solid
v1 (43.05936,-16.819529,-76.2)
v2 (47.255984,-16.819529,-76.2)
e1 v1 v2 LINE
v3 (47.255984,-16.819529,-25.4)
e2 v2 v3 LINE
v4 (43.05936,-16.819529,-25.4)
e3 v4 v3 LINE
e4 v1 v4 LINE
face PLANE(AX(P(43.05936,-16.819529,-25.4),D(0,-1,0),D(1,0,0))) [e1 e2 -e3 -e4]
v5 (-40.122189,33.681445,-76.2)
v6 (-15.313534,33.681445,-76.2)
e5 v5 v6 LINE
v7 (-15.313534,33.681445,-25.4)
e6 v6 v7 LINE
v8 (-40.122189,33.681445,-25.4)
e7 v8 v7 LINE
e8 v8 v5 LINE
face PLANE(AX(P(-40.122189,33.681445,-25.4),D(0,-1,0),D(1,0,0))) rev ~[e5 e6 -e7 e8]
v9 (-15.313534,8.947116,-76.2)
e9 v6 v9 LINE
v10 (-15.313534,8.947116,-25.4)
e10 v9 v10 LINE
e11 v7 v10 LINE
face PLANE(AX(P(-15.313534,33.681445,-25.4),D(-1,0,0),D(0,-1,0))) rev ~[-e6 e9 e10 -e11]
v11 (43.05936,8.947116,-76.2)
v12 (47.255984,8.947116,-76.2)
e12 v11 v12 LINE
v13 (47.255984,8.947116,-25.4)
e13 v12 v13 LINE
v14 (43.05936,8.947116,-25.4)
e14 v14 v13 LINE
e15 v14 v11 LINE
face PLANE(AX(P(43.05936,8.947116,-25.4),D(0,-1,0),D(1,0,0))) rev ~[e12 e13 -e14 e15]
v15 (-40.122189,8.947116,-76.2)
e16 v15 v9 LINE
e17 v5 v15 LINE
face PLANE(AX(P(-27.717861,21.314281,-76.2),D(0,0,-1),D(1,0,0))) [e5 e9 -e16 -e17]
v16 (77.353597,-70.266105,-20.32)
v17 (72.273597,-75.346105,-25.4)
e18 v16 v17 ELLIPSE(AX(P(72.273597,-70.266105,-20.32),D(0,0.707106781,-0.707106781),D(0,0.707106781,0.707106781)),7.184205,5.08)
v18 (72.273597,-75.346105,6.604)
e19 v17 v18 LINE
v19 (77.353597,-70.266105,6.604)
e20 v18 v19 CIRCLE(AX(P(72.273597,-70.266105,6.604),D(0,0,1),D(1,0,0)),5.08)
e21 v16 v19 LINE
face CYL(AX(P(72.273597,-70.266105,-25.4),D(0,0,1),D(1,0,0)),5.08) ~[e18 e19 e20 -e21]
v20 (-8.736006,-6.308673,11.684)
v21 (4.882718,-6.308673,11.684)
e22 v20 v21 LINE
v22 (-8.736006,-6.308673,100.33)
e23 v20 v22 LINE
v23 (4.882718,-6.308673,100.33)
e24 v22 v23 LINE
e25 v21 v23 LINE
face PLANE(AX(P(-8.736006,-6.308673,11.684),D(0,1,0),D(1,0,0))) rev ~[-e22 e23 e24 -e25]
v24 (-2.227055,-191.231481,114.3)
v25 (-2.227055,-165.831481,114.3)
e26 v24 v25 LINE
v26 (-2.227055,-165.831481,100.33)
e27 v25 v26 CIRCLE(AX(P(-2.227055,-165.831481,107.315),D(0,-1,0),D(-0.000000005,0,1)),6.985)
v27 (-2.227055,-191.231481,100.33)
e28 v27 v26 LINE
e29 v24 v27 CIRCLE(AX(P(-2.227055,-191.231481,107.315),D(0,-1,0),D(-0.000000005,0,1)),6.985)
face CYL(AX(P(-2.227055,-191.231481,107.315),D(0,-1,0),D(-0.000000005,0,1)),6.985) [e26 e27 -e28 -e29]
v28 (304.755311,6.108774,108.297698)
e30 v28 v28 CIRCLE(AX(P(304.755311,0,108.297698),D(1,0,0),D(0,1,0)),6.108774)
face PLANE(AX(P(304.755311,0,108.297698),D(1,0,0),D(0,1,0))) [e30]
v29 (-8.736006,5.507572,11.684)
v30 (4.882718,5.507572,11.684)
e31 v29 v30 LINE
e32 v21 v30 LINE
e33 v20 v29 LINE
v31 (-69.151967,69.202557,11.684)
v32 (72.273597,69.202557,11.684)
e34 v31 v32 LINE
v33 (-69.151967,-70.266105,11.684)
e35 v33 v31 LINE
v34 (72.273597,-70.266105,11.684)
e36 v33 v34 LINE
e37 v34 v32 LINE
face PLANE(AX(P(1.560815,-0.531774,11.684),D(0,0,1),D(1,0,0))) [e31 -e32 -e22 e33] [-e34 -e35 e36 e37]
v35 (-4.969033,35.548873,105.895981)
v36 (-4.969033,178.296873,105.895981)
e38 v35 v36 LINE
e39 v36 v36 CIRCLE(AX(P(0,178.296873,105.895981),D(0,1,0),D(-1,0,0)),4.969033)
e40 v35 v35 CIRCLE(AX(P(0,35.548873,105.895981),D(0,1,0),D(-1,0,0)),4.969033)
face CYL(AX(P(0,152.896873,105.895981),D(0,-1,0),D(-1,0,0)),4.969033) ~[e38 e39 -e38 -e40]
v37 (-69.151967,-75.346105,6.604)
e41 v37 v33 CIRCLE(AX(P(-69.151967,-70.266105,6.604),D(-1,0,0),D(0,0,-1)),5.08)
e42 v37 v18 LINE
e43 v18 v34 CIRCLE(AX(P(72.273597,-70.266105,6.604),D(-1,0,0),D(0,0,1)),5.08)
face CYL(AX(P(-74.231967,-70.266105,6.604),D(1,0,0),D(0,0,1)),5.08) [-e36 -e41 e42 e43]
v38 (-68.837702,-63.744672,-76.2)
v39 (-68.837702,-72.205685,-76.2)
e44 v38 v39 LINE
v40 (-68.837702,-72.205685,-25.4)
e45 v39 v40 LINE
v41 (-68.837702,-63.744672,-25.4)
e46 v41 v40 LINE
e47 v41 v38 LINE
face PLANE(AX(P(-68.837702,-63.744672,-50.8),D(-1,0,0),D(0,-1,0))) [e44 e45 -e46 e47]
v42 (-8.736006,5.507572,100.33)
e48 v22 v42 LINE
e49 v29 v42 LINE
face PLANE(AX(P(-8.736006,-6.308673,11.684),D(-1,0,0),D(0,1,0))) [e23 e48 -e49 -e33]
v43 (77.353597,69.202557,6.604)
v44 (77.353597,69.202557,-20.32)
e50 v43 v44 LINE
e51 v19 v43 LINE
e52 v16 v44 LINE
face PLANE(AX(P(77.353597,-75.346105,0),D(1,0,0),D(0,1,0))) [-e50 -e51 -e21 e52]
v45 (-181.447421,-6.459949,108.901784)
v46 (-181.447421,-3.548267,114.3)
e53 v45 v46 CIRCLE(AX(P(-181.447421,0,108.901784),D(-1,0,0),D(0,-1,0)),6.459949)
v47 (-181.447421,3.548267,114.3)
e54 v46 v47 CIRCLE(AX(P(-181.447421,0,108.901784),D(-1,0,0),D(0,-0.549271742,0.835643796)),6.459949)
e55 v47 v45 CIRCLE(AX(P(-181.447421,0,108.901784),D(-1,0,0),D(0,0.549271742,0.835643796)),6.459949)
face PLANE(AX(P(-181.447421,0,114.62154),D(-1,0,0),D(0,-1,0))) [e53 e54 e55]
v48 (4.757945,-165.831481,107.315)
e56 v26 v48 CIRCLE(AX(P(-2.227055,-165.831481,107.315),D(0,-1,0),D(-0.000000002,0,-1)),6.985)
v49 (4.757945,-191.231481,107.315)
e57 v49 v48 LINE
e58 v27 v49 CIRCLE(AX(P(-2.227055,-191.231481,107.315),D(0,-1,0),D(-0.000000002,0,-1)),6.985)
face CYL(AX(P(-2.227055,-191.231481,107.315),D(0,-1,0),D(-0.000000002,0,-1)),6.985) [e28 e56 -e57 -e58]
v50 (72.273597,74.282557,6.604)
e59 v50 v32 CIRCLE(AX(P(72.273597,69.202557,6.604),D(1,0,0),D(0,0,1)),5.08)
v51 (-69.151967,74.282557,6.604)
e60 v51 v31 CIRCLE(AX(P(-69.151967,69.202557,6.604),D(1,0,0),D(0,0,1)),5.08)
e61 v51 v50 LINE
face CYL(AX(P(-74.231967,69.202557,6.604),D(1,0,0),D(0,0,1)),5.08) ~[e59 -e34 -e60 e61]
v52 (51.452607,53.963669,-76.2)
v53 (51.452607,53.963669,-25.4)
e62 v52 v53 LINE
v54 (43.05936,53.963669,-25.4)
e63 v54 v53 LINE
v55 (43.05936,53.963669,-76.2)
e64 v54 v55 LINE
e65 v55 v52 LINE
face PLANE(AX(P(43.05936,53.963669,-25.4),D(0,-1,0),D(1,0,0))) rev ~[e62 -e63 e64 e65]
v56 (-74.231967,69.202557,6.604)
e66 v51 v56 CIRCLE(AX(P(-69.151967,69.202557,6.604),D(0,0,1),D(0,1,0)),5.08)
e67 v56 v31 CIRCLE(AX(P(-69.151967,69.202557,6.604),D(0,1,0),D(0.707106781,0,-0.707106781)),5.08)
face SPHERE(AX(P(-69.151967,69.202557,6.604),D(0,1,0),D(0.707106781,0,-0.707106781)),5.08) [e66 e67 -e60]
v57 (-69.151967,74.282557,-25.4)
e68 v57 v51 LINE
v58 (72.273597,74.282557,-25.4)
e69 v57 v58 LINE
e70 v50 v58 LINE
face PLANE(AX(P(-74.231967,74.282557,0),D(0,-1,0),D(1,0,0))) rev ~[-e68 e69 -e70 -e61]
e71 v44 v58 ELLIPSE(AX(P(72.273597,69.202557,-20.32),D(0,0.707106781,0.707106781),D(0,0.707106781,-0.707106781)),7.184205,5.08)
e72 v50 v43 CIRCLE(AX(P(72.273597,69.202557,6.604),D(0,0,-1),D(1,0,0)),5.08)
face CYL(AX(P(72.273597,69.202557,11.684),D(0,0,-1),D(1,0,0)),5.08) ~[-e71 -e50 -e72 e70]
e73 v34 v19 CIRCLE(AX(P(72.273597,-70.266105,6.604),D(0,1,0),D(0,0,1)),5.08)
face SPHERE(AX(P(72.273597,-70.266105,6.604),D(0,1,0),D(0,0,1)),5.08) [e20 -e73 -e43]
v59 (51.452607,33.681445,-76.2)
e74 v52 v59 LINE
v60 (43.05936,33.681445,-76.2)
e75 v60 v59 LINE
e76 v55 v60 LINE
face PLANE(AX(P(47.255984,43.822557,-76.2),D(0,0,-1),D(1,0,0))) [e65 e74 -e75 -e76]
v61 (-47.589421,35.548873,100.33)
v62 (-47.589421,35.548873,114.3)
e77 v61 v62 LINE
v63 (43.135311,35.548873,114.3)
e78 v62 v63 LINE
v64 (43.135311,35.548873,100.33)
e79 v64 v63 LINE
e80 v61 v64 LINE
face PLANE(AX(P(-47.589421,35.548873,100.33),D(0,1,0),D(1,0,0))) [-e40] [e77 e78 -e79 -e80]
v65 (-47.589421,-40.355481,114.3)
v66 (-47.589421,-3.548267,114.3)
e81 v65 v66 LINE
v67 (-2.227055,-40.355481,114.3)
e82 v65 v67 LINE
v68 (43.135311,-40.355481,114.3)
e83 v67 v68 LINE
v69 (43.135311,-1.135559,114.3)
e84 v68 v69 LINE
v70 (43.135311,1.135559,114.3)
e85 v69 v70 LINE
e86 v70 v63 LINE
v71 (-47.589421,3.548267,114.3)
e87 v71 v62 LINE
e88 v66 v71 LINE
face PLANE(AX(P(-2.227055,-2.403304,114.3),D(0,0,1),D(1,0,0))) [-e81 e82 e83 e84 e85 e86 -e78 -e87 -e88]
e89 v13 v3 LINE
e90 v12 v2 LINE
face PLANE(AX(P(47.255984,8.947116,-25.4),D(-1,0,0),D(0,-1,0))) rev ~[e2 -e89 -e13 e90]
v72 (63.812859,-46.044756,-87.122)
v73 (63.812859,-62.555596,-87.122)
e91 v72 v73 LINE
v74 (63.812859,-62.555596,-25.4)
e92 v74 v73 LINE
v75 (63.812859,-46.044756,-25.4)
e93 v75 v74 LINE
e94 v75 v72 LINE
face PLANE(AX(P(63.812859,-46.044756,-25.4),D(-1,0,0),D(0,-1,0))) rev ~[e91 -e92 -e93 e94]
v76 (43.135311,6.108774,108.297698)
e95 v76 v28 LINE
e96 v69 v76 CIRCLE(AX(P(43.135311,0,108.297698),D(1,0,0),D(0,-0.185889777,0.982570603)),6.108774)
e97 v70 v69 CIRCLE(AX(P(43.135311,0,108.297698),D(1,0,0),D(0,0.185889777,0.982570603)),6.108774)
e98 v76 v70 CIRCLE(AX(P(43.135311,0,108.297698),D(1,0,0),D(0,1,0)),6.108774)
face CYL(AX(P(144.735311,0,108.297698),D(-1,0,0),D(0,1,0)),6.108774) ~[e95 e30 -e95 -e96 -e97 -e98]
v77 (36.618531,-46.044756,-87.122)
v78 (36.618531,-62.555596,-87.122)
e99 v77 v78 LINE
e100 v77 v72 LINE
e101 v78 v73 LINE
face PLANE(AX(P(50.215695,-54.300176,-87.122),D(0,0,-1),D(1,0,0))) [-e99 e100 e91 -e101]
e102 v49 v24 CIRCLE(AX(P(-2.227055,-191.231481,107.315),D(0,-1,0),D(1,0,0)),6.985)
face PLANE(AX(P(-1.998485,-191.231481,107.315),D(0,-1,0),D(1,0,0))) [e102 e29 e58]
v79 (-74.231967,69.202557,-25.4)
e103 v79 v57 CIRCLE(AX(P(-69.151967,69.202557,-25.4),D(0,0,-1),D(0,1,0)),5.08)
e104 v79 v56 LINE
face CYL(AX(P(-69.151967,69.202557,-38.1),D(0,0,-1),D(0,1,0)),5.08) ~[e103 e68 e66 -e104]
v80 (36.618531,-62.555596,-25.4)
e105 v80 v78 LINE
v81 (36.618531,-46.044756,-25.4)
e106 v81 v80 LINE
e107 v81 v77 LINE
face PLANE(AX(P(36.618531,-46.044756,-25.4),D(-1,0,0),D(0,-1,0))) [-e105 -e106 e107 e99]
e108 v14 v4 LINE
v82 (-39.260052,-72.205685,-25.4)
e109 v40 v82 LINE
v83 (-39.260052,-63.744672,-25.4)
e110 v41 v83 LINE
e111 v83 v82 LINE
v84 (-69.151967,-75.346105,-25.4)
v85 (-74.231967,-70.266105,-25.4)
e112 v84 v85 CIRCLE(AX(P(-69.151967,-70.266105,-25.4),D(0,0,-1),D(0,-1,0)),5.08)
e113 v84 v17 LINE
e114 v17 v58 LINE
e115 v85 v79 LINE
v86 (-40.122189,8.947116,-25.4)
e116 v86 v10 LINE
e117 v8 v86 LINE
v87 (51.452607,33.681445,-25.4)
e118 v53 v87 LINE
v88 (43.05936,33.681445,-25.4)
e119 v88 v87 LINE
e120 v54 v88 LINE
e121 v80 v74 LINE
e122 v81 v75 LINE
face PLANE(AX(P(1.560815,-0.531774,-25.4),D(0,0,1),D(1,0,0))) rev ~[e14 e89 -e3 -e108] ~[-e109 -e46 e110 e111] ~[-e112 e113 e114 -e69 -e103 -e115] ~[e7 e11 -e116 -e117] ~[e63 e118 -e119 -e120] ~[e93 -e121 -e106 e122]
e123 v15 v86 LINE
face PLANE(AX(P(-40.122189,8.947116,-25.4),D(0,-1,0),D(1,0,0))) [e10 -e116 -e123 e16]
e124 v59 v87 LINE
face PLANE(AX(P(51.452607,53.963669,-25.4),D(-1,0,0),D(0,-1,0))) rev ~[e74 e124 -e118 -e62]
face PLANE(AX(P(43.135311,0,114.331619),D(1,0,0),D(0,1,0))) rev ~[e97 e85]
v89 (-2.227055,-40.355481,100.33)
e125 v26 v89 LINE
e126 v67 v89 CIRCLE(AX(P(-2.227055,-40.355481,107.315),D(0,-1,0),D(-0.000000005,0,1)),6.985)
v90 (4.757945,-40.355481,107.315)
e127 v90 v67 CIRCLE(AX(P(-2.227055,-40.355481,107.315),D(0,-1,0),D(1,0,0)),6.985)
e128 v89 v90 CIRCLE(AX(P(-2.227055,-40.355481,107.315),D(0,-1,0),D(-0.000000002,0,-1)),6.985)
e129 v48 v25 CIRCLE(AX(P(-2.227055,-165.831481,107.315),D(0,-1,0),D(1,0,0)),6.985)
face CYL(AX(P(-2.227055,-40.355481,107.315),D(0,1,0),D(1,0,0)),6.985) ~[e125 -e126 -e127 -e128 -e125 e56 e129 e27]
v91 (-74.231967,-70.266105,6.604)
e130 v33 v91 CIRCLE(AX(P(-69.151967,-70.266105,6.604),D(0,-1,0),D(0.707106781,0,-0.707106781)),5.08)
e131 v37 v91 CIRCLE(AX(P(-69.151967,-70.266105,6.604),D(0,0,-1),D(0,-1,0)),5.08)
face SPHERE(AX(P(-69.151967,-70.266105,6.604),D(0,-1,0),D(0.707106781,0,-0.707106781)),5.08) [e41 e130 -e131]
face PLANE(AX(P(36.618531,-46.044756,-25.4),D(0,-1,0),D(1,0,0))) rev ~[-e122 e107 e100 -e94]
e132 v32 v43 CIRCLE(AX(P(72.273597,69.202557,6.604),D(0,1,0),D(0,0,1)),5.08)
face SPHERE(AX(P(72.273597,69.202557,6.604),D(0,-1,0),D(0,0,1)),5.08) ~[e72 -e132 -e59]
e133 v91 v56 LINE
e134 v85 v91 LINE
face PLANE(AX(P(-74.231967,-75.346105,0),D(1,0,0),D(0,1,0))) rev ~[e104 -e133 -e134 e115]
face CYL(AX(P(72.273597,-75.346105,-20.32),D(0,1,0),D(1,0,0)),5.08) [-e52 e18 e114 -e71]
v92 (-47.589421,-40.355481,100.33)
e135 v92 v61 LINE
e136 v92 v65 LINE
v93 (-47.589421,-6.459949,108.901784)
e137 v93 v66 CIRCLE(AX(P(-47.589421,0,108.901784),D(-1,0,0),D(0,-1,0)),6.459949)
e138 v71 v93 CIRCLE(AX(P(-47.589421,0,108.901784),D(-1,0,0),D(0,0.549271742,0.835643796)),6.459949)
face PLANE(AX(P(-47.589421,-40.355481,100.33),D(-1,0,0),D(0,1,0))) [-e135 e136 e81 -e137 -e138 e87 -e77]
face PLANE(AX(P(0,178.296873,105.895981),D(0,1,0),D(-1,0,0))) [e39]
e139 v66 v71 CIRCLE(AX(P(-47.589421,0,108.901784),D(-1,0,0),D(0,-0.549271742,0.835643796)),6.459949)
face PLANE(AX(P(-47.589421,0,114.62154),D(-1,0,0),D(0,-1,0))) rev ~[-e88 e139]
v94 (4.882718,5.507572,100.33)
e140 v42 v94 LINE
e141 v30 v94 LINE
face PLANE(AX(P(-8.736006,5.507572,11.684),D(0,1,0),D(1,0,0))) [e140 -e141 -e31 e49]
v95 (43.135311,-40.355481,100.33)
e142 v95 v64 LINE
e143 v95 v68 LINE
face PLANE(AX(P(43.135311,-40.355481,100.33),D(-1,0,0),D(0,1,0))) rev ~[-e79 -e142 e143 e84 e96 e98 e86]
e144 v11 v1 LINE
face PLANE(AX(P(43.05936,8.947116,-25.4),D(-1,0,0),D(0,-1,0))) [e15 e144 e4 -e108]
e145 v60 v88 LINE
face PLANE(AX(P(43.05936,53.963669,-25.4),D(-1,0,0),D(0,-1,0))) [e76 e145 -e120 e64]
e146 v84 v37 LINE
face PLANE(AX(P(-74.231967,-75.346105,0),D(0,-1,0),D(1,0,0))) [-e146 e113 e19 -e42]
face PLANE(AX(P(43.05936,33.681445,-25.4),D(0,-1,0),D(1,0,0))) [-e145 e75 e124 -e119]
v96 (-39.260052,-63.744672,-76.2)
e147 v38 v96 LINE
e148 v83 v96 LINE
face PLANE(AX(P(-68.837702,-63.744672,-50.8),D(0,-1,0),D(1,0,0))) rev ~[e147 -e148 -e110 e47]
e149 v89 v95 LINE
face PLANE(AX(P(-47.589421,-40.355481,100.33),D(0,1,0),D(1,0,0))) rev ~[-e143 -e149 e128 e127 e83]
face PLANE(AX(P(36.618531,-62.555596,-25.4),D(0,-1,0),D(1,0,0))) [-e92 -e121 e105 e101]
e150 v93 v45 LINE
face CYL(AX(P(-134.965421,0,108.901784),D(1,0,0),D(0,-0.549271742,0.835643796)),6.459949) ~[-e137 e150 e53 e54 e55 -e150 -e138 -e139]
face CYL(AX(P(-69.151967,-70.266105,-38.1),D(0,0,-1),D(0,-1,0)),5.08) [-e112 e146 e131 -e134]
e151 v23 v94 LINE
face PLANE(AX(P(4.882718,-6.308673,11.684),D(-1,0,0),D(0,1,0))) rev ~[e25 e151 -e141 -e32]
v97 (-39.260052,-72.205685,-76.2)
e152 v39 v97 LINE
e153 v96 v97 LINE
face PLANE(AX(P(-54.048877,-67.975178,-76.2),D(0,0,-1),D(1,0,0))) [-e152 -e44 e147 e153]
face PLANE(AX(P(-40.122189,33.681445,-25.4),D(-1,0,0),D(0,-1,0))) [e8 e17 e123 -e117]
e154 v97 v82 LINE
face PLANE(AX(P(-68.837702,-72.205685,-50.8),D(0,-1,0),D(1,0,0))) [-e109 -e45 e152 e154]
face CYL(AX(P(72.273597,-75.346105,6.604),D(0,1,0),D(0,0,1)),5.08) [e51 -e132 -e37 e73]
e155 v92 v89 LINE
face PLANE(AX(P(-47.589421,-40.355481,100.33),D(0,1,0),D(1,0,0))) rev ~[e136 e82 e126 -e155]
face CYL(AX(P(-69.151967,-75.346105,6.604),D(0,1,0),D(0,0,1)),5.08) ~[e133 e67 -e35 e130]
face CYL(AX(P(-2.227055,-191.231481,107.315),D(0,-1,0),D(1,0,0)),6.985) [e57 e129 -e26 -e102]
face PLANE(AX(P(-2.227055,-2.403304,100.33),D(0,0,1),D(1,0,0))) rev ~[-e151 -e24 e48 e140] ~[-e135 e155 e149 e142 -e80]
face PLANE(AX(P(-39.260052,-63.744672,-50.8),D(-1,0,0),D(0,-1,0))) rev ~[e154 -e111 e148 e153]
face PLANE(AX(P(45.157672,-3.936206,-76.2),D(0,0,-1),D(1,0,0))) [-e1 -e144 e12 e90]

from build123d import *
from build123d import SkipClean  # not in build123d's __all__

# Parameters (mm, degrees)
F0_W          = 151.5855640173
F0_H          = 149.6286615729
F1_DEPTH      = 11.684
F2_DEPTH      = 25.4
F3_W          = 4.1966233402
F3_H          = 25.7666455582
F3_W_2        = 24.8086545616
F3_H_2        = 24.7343285009
F3_W_3        = 8.3932466805
F3_H_3        = 20.2822238207
F3_W_4        = 29.5776501298
F3_H_4        = 8.4610134363
F5_DEPTH      = 25.4
F6_DEPTH      = 25.4
F8_W          = 13.618723955
F8_H          = 11.8162455037
F9_DEPTH      = 88.646
F10_W         = 90.7247327268
F10_H         = 75.9043544531
F11_DEPTH     = 13.97
F13_DEPTH     = 25.4
F14_DEPTH     = 125.476
F16_DEPTH     = 25.4
F17_R         = 4.969033059
F18_DEPTH     = 117.348
F20_DEPTH     = 87.376
F21_R         = 6.1087740457
F22_DEPTH     = 25.4
F23_DEPTH     = 25.4
F24_DEPTH     = 25.4
F25_R         = 5.08
F26_T1_DEPTH  = 44.704
F26_S5_W      = 5.08
F26_S5_H      = 5.08
F26_T6_DEPTH  = 5.08
F26_S11_W     = 5.08
F26_S11_H     = 5.08
F26_T12_DEPTH = 5.08
F27_W         = 27.1943286061
F27_H         = 16.5108405054
F28_DEPTH     = 61.722
F29_DEPTH     = 25.4
F30_DEPTH     = 160.02
F31_DEPTH     = 46.482


# Not quite as in the source:
# - a fillet or chamfer that OpenCascade refuses, or shapes differently, is made with other operations: its cross-section is extruded or revolved along the edge and cut away or added
# - after a boolean that leaves OpenCascade's solid faulty, fix() repairs it
# - a feature names something its author has since deleted; it is built from what else it names


with BuildPart() as f1:
    # F0 (on Top) → F1 (new body)
    with BuildSketch(Plane.XY):
        with Locations((1.5608146787, -0.5317740142)):
            Rectangle(F0_W, F0_H)
    extrude(amount=F1_DEPTH)

    # F2 (add): a face of the model
    f2_faces = [f1.faces().sort_by_distance(p)[0] for p in [
        (1.5608146787, -0.5317740142, 0),
    ]]
    extrude(f2_faces, amount=F2_DEPTH)

    # F3 (on face) → F5 (join)
    with BuildSketch(Plane(origin=(0, 0, -25.4), x_dir=(1, 0, 0), z_dir=(0, 0, -1))):
        with Locations((45.1576719061, 3.9362064563)):
            Rectangle(F3_W, F3_H)
        with Locations((-27.7178613469, -21.3142805733)):
            Rectangle(F3_W_2, F3_H_2)
        with Locations((47.2559835762, -43.8225567341)):
            Rectangle(F3_W_3, F3_H_3)
        with Locations((-54.0488772094, 67.9751783609)):
            Rectangle(F3_W_4, F3_H_4)
    extrude(amount=F5_DEPTH)

    # F6 (add): faces of the model
    f6_faces = [f1.faces().sort_by_distance(p)[0] for p in [
        (-54.0488772094, -67.9751783609, -50.8),
        (-27.7178613469, 21.3142805733, -50.8),
        (45.1576719061, -3.9362064563, -50.8),
        (47.2559835762, 43.8225567341, -50.8),
    ]]
    extrude(f6_faces, amount=F6_DEPTH)

    # F8 (on face) → F9 (join)
    with BuildSketch(Plane.XY.offset(11.684)):
        with Locations((-1.9266440067, -0.4005506635)):
            Rectangle(F8_W, F8_H)
    extrude(amount=F9_DEPTH)

    # F10 (on face) → F11 (join)
    with BuildSketch(Plane.XY.offset(100.33)):
        with Locations((-2.2270549089, -2.4033039808)):
            Rectangle(F10_W, F10_H)
    extrude(amount=F11_DEPTH)

    # F12 (on face) → F13 (join)
    with BuildSketch(Plane.XZ.offset(40.3554812074)):
        with BuildLine():
            ThreePointArc((-2.2270549227, 100.33), (2.7120859528, 102.3758591285), (4.7579450911, 107.315))
            ThreePointArc((4.7579450911, 107.315), (2.712085945, 112.2541408793), (-2.227054945, 114.3))
            ThreePointArc((-2.227054945, 114.3), (-9.2120549089, 107.3149999888), (-2.2270549227, 100.33))
        make_face()
    extrude(amount=F13_DEPTH)

    # F14 (add): a face of the model
    f14_faces = [f1.faces().sort_by_distance(p)[0] for p in [
        (-2.2270549089, -65.7554812074, 107.315),
    ]]
    with SkipClean():  # cleaning this boolean's faces spoils the solid; the shape is the same uncleaned
        extrude(f14_faces, amount=F14_DEPTH)

    # F15 (on face) → F16 (join)
    with BuildSketch(Plane.YZ.offset(43.1353114545)):
        with BuildLine():
            Line((-1.1355586467, 114.3), (1.1355586467, 114.3))
            ThreePointArc((1.1355586467, 114.3), (0, 114.4064722454), (-1.1355586467, 114.3))
        make_face()
        with BuildLine():
            ThreePointArc((-1.1355586467, 114.3), (-3.8974510358, 103.5937641266), (6.1087740457, 108.2976981997))
            ThreePointArc((6.1087740457, 108.2976981997), (4.7039340732, 112.1951492356), (1.1355586467, 114.3))
            Line((1.1355586467, 114.3), (-1.1355586467, 114.3))
        make_face()
    extrude(amount=F16_DEPTH)

    add(f1.part.fix(), mode=Mode.REPLACE)

    # F17 (on face) → F18 (join)
    with BuildSketch(Plane(origin=(0, 35.5488732457, 0), x_dir=(-1, 0, 0), z_dir=(0, 1, 0))):
        with Locations((0, 105.8959811926)):
            Circle(F17_R)
    extrude(amount=F18_DEPTH)

    # F19 (on face) → F20 (join)
    with BuildSketch(Plane(origin=(-47.5894212723, 0, 0), x_dir=(0, -1, 0), z_dir=(-1, 0, 0))):
        with BuildLine():
            Line((-3.5482673546, 114.3), (3.5482673546, 114.3))
            ThreePointArc((3.5482673546, 114.3), (0, 115.3617326707), (-3.5482673546, 114.3))
        make_face()
        with BuildLine():
            ThreePointArc((-3.5482673546, 114.3), (-3.0667012813, 103.2161631583), (6.4599488467, 108.901783824))
            ThreePointArc((6.4599488467, 108.901783824), (5.6856206657, 111.9684851053), (3.5482673546, 114.3))
            Line((3.5482673546, 114.3), (-3.5482673546, 114.3))
        make_face()
    extrude(amount=F20_DEPTH)

    # F21 (on face) → F22 (join)
    with BuildSketch(Plane.YZ.offset(68.5353114545)):
        with Locations((0, 108.2976981997)):
            Circle(F21_R)
    extrude(amount=F22_DEPTH)

    # F23 (add): faces of the model
    f23_faces = [f1.faces().sort_by_distance(p)[0] for p in [
        (0, 152.8968732457, 105.8959811926),
        (-2.2270549089, -191.2314812074, 107.315),
    ]]
    extrude(f23_faces, amount=F23_DEPTH, dir=(0, 1, 0))

    # F24 (add): a face of the model
    f24_faces = [f1.faces().sort_by_distance(p)[0] for p in [
        (93.9353114545, 0, 108.2976981997),
    ]]
    extrude(f24_faces, amount=F24_DEPTH)

    # F25
    f25_edges = [f1.edges().sort_by_distance(p)[0] for p in [
        (77.353597, -0.531774, 11.684),
        (1.560815, -75.346105, 11.684),
        (-74.231967, -0.531774, 11.684),
        (1.560815, 74.282557, 11.684),
        (77.353597, -75.346105, -6.858),
        (77.353597, 74.282557, -6.858),
        (77.353597, -0.531774, -25.4),
    ]]
    fillet(f25_edges, radius=F25_R)

    # F26: fillet of radius 5.08 on 2 edges, made by hand

    # F26_s2 → F26_t1 (cut)
    with BuildSketch(Plane.XY.offset(-38.1)):
        with BuildLine():
            ThreePointArc((-69.15196733, -75.3461048007), (-72.7440697784, -73.8582072491), (-74.23196733, -70.2661048007))
            Line((-74.23196733, -70.2661048007), (-74.23196733, -75.3461048007))
            Line((-74.23196733, -75.3461048007), (-69.15196733, -75.3461048007))
        make_face()
        with BuildLine():
            ThreePointArc((-69.15196733, 74.2825567722), (-72.7440697784, 72.7946592207), (-74.23196733, 69.2025567722))
            Line((-74.23196733, 69.2025567722), (-74.23196733, 74.2825567722))
            Line((-74.23196733, 74.2825567722), (-69.15196733, 74.2825567722))
        make_face()
    extrude(amount=F26_T1_DEPTH, mode=Mode.SUBTRACT)


with BuildPart() as f26_tool4:
    # F26_s5 → F26_t6 (new body)
    with BuildSketch(Plane.XZ.offset(-69.2025567722)):
        with Locations((-71.69196733, 9.144)):
            Rectangle(F26_S5_W, F26_S5_H)
    extrude(amount=-F26_T6_DEPTH)

    # F26_s7 → F26_t8 (revolve, cut)
    with BuildSketch(Plane(origin=(-69.15196733, 69.2025567722, 6.604), x_dir=(0.7071067812, 0, -0.7071067812), z_dir=(0.7071067812, 0, 0.7071067812))):
        with BuildLine():
            ThreePointArc((0, -5.08), (5.08, 0), (0, 5.08))
            Line((0, 5.08), (0, -5.08))
        make_face()
    revolve(axis=Axis((-69.15196733, 69.2025567722, 6.604), (0, 1, 0)), mode=Mode.SUBTRACT)


with BuildPart() as f1_1:
    add(f1.part, clean=False)

    # F26_t3: cut F26_tool4
    add(f26_tool4.part, mode=Mode.SUBTRACT)


with BuildPart() as f26_tool10:
    # F26_s11 → F26_t12 (new body)
    with BuildSketch(Plane.XZ.offset(70.2661048007)):
        with Locations((-71.69196733, 9.144)):
            Rectangle(F26_S11_W, F26_S11_H)
    extrude(amount=F26_T12_DEPTH)

    # F26_s13 → F26_t14 (revolve, cut)
    with BuildSketch(Plane(origin=(-69.15196733, -70.2661048007, 6.604), x_dir=(0.7071067812, 0, -0.7071067812), z_dir=(-0.7071067812, 0, -0.7071067812))):
        with BuildLine():
            ThreePointArc((0, -5.08), (5.08, 0), (0, 5.08))
            Line((0, 5.08), (0, -5.08))
        make_face()
    revolve(axis=Axis((-69.15196733, -70.2661048007, 6.604), (0, -1, 0)), mode=Mode.SUBTRACT)


with BuildPart() as f1_2:
    add(f1_1.part, clean=False)

    # F26_t9: cut F26_tool10
    add(f26_tool10.part, mode=Mode.SUBTRACT)

    # F27 (on face) → F28 (join)
    with BuildSketch(Plane(origin=(0, 0, -25.4), x_dir=(1, 0, 0), z_dir=(0, 0, -1))):
        with Locations((50.2156950533, 54.3001759797)):
            Rectangle(F27_W, F27_H)
    extrude(amount=F28_DEPTH)

    # F29 (add): a face of the model
    f29_faces = [f1_2.faces().sort_by_distance(p)[0] for p in [
        (119.3353114545, 0, 108.2976981997),
    ]]
    extrude(f29_faces, amount=F29_DEPTH)

    # F30 (add): a face of the model
    f30_faces = [f1_2.faces().sort_by_distance(p)[0] for p in [
        (144.7353114545, 0, 108.2976981997),
    ]]
    extrude(f30_faces, amount=F30_DEPTH)

    # F31 (add): a face of the model
    f31_faces = [f1_2.faces().sort_by_distance(p)[0] for p in [
        (-134.9654212723, 0, 108.901783824),
    ]]
    extrude(f31_faces, amount=F31_DEPTH)


solid = f1_2.part
